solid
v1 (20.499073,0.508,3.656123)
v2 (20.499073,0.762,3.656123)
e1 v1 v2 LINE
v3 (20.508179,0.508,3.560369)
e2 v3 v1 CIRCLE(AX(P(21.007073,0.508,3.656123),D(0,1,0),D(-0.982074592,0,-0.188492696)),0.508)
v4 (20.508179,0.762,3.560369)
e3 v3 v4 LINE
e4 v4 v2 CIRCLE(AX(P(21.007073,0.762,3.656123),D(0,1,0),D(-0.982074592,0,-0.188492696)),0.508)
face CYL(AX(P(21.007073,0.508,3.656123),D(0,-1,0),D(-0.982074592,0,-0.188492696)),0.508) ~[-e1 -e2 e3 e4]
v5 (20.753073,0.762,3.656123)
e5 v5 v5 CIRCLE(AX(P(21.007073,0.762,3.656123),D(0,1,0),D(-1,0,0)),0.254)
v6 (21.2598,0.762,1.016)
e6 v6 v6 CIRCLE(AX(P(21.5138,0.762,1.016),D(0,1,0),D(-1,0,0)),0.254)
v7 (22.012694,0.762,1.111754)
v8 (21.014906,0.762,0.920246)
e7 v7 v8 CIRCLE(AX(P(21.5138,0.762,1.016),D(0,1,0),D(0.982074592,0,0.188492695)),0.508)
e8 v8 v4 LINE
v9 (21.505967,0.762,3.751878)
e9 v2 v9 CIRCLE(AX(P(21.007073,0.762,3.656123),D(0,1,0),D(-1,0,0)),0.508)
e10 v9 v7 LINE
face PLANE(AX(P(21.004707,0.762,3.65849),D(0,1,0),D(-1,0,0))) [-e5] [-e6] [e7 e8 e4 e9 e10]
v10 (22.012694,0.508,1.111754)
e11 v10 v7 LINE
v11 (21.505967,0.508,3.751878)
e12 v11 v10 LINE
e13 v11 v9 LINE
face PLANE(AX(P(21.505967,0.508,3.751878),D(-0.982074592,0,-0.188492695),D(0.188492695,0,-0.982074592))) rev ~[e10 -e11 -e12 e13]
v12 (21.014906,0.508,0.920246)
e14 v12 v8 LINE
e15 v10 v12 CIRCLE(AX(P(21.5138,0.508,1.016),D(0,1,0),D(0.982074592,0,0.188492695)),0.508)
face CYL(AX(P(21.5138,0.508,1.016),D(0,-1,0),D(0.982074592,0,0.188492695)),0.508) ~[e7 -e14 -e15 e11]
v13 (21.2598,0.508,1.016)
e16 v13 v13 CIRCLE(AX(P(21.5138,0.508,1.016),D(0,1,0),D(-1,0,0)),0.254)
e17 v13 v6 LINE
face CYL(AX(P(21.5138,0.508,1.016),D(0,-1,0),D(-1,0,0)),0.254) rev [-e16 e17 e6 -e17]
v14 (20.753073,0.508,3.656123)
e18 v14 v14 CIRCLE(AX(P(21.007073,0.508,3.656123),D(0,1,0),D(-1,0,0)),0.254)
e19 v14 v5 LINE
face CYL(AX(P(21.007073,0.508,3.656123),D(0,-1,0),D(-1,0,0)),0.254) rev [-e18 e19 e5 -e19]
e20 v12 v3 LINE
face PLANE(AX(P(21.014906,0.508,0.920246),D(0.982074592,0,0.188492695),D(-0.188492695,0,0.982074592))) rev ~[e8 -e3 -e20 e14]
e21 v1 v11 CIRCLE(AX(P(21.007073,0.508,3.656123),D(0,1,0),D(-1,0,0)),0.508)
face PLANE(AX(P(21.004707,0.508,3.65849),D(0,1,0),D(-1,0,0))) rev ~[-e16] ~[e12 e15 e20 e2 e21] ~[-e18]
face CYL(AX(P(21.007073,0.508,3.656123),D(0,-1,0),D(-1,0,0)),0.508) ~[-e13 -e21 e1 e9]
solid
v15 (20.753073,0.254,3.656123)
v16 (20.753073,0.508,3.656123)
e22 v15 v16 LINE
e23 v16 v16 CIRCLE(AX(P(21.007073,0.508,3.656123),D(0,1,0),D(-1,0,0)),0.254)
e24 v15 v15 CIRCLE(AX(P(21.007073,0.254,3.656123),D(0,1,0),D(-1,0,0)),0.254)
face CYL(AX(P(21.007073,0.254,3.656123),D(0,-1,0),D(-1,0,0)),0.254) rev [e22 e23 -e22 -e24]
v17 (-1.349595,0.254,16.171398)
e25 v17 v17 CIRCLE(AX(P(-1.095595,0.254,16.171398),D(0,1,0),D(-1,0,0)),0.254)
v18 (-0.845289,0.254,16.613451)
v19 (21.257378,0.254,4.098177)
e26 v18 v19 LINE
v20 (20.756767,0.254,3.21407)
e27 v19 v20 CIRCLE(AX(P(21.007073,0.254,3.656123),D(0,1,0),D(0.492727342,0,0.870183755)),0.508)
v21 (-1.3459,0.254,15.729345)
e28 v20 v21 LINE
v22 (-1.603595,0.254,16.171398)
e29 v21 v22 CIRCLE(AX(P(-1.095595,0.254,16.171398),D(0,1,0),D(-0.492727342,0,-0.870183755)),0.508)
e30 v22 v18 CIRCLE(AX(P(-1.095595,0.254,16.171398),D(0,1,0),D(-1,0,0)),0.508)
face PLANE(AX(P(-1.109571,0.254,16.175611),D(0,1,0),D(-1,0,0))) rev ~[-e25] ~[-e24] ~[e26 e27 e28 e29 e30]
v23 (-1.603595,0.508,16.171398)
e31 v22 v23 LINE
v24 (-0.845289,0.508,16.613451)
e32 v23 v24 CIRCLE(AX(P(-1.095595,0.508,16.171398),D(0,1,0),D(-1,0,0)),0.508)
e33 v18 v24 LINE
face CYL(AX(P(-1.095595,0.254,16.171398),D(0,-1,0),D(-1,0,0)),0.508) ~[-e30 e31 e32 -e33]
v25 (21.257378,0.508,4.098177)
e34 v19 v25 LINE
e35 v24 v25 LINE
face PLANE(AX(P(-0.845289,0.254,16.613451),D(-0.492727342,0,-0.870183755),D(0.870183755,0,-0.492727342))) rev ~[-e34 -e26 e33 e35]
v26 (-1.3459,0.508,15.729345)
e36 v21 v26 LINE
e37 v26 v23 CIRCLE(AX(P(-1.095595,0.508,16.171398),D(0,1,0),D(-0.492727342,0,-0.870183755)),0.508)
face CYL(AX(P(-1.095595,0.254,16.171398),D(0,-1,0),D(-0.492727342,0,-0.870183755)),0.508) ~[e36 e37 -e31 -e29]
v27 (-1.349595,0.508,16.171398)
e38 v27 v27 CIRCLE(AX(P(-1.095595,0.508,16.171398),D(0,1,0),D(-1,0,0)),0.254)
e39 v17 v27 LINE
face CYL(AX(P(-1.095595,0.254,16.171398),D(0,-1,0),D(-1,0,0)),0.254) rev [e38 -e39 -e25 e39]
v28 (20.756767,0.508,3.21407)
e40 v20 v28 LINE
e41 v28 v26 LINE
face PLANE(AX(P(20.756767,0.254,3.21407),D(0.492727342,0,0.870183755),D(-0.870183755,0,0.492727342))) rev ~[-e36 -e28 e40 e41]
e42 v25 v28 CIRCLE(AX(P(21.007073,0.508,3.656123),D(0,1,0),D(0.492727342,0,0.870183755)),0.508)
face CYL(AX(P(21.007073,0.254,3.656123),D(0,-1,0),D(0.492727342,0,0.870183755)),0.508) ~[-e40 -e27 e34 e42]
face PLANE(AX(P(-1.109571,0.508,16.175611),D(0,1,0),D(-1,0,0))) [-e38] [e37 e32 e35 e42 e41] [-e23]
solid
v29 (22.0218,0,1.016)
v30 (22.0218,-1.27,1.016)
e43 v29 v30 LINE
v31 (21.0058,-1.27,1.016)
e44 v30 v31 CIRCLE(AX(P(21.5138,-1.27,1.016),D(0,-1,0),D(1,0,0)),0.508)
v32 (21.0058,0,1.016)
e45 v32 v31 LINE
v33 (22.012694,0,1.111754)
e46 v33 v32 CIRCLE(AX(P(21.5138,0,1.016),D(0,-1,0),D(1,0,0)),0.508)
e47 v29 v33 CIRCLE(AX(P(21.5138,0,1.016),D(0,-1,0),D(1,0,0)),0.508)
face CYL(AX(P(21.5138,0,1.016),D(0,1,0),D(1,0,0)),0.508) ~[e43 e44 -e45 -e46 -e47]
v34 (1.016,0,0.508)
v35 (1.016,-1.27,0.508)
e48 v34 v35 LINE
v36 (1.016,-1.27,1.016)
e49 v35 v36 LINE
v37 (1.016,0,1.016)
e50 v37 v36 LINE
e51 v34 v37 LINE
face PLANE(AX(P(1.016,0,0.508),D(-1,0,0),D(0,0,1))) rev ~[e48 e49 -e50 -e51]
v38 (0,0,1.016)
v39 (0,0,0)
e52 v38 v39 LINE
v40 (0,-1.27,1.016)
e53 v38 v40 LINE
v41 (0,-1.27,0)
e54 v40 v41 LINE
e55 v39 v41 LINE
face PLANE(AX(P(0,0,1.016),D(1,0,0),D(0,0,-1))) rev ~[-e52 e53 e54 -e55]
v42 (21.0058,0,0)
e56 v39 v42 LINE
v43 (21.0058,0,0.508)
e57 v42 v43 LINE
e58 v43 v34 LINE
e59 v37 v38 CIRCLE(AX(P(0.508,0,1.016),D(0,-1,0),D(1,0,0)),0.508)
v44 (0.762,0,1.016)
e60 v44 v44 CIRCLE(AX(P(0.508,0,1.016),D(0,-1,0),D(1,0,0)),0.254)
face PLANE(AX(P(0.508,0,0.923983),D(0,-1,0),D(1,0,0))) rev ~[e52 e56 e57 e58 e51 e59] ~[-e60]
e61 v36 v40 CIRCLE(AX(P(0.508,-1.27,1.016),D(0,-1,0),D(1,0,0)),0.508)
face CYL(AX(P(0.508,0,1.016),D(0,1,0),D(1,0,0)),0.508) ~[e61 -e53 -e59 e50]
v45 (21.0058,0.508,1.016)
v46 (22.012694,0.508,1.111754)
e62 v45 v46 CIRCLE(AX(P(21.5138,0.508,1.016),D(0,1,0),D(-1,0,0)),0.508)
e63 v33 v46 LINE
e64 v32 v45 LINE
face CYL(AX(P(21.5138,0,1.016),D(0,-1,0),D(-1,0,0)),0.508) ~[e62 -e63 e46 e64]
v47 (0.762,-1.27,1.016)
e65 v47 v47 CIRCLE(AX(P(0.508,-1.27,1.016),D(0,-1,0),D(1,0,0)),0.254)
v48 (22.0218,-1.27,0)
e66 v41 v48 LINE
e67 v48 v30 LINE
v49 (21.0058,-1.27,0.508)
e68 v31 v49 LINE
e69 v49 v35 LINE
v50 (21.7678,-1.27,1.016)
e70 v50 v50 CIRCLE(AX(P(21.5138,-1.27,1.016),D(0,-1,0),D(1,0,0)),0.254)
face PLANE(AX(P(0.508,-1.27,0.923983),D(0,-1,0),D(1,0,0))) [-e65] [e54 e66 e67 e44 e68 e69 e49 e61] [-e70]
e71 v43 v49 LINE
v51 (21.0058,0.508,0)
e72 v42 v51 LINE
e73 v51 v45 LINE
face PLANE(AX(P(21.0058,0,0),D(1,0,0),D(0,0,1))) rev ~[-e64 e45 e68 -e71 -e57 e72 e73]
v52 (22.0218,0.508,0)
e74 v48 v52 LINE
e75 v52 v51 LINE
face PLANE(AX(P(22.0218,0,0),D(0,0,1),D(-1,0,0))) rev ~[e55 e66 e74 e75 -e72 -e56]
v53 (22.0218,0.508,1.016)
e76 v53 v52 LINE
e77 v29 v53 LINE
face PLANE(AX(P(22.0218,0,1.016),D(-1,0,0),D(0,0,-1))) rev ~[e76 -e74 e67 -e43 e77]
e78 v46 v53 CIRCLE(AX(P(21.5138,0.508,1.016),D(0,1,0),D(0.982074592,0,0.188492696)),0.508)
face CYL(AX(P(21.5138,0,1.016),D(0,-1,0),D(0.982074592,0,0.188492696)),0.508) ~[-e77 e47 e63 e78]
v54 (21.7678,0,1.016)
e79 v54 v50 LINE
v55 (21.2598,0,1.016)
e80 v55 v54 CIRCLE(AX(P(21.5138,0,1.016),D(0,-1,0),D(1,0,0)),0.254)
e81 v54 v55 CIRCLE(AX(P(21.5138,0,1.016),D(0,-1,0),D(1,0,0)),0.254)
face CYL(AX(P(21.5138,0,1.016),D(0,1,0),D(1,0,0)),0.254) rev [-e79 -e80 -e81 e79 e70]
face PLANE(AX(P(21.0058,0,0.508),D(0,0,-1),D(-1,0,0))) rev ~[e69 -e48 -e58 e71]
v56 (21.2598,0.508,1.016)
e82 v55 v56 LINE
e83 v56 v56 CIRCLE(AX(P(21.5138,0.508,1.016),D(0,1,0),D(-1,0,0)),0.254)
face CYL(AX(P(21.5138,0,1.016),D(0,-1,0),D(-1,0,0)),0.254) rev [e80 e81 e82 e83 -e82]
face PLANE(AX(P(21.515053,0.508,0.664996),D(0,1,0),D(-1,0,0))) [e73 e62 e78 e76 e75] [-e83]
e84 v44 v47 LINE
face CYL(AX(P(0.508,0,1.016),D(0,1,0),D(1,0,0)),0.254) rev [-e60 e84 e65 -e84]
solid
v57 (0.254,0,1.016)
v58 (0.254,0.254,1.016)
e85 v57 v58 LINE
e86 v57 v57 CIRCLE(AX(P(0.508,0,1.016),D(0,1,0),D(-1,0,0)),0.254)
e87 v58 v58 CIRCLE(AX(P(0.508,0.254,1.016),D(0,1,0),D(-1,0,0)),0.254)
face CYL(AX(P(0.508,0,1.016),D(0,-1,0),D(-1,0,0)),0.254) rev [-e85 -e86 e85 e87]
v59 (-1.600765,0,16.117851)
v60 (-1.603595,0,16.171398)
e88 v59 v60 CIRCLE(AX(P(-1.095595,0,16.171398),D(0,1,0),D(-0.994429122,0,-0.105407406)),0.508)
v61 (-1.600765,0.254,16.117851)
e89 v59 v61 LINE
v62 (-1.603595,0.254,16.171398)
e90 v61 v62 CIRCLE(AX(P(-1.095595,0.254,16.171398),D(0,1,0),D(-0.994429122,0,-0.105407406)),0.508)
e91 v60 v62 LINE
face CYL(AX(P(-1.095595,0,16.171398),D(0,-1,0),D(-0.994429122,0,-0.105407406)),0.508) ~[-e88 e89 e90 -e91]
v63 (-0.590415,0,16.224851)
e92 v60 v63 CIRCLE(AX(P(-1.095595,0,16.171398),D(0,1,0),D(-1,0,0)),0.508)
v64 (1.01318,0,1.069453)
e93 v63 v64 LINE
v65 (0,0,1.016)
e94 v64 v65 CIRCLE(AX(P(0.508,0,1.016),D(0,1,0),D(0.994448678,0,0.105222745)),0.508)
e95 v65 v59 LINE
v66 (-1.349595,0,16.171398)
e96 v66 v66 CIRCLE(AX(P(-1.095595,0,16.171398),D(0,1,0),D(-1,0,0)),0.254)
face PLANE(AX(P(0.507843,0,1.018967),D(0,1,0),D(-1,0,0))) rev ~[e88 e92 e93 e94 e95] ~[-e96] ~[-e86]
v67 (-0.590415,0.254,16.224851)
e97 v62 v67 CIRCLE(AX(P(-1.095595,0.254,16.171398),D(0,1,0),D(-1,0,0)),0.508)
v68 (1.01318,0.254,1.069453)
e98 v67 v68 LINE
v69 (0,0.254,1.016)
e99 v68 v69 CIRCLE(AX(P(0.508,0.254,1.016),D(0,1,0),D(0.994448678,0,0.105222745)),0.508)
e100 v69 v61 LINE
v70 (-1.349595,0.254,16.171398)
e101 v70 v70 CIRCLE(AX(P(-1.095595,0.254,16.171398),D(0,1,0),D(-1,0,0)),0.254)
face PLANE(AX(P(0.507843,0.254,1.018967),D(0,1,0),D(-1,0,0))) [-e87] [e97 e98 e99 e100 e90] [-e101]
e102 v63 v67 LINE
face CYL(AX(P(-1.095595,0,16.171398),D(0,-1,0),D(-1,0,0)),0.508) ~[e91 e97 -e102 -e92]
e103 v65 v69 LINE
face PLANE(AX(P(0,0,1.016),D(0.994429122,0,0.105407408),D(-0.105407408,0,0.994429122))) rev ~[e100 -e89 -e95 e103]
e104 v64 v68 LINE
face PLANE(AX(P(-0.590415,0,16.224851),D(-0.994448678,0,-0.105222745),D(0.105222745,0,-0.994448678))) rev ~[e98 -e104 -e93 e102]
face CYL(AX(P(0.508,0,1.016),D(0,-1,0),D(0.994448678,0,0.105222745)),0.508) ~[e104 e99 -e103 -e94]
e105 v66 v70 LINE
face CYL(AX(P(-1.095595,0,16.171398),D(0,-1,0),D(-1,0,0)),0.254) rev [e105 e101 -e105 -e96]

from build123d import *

# Parameters (mm, degrees)
F0_R     = 0.254
F1_DEPTH = 1.27
F2_R     = 0.254
F3_DEPTH = 0.254
F4_R     = 0.254
F5_DEPTH = 0.254
F6_R     = 0.254
F7_DEPTH = 0.254
F8_R     = 0.254
F9_DEPTH = 0.508


with BuildPart() as f1:
    # F0 (on Front) → F1 (new body)
    with BuildSketch(Plane.XZ):
        with BuildLine():
            Line((0, 1.016), (0, 0.508))
            Line((0, 0.508), (1.016, 0.508))
            Line((1.016, 0.508), (1.016, 1.016))
            ThreePointArc((1.016, 1.016), (0.508, 1.524), (0, 1.016))
        make_face()
        with Locations((0.508, 1.016)):
            Circle(F0_R, mode=Mode.SUBTRACT)
        Polygon((0, 0.508), (0, 0), (22.0218, 0), (22.0218, 0.508), (21.0058, 0.508), (1.016, 0.508), align=None)
        with BuildLine():
            Line((21.0058, 0.508), (22.0218, 0.508))
            Line((22.0218, 0.508), (22.0218, 1.016))
            ThreePointArc((22.0218, 1.016), (21.5138, 1.524), (21.0058, 1.016))
            Line((21.0058, 1.016), (21.0058, 0.508))
        make_face()
        with Locations((21.5138, 1.016)):
            Circle(F0_R, mode=Mode.SUBTRACT)
    extrude(amount=F1_DEPTH)

    # F8 (on face) → F9 (join)
    with BuildSketch(Plane(origin=(0, 0, 0), x_dir=(-1, 0, 0), z_dir=(0, 1, 0))):
        with BuildLine():
            ThreePointArc((-22.0126938926, 1.1117542892), (-22.0195183492, 1.064093152), (-22.0218, 1.016))
            Line((-22.0218, 1.016), (-22.0218, 0.508))
            Line((-22.0218, 0.508), (-22.0218, 0))
            Line((-22.0218, 0), (-21.0058, 0))
            Line((-21.0058, 0), (-21.0058, 0.508))
            Line((-21.0058, 0.508), (-21.0058, 1.016))
            ThreePointArc((-21.0058, 1.016), (-21.465706848, 1.5217183492), (-22.0126938926, 1.1117542892))
        make_face()
        with Locations((-21.5138, 1.016)):
            Circle(F8_R, mode=Mode.SUBTRACT)
    extrude(amount=F9_DEPTH)


with BuildPart() as f3:
    # F2 (on face) → F3 (new body)
    with BuildSketch(Plane(origin=(0, 0, 0), x_dir=(-1, 0, 0), z_dir=(0, 1, 0))):
        with BuildLine():
            ThreePointArc((-1.0131799286, 1.0694531545), (-0.5347637466, 0.5087055077), (0, 1.016))
            ThreePointArc((0, 1.016), (-0.4812362534, 1.5232944923), (-1.0131799286, 1.0694531545))
        make_face()
        with Locations((-0.508, 1.016)):
            Circle(F2_R, mode=Mode.SUBTRACT)
        with BuildLine():
            ThreePointArc((-1.0131799286, 1.0694531545), (-0.4812362534, 1.5232944923), (0, 1.016))
            Line((0, 1.016), (1.6007646277, 16.1178508951))
            ThreePointArc((1.6007646277, 16.1178508951), (1.0420945746, 15.6662228951), (0.5904147052, 16.224851013))
            Line((0.5904147052, 16.224851013), (-1.0131799286, 1.0694531545))
        make_face()
        with BuildLine():
            ThreePointArc((0.5904147052, 16.224851013), (1.0420945746, 15.6662228951), (1.6007646277, 16.1178508951))
            ThreePointArc((1.6007646277, 16.1178508951), (1.6028866389, 16.1445870108), (1.6035946338, 16.1713978585))
            ThreePointArc((1.6035946338, 16.1713978585), (1.1223583804, 16.6786923508), (0.5904147052, 16.224851013))
        make_face()
        with Locations((1.0955946338, 16.1713978585)):
            Circle(F2_R, mode=Mode.SUBTRACT)
    extrude(amount=F3_DEPTH)


with BuildPart() as f5:
    # F4 (on face) → F5 (new body)
    with BuildSketch(Plane(origin=(0, 0.254, 0), x_dir=(-1, 0, 0), z_dir=(0, 1, 0))):
        with BuildLine():
            ThreePointArc((1.3459001233, 15.7293445112), (1.5344677297, 15.9155572721), (1.6035946338, 16.1713978585))
            ThreePointArc((1.6035946338, 16.1713978585), (1.3514352202, 16.6102709545), (0.8452891443, 16.6134512059))
            ThreePointArc((0.8452891443, 16.6134512059), (0.6535412864, 15.921092369), (1.3459001233, 15.7293445112))
        make_face()
        with Locations((1.0955946338, 16.1713978585)):
            Circle(F4_R, mode=Mode.SUBTRACT)
        with BuildLine():
            ThreePointArc((1.3459001233, 15.7293445112), (0.6535412864, 15.921092369), (0.8452891443, 16.6134512059))
            Line((0.8452891443, 16.6134512059), (-21.2573782243, 4.0981767306))
            ThreePointArc((-21.2573782243, 4.0981767306), (-20.7512321484, 4.0949964791), (-20.4990727348, 3.6561233832))
            ThreePointArc((-20.4990727348, 3.6561233832), (-20.5681996389, 3.4002827968), (-20.7567672453, 3.2140700358))
            Line((-20.7567672453, 3.2140700358), (1.3459001233, 15.7293445112))
        make_face()
        with BuildLine():
            ThreePointArc((-20.4990727348, 3.6561233832), (-20.7512321484, 4.0949964791), (-21.2573782243, 4.0981767306))
            ThreePointArc((-21.2573782243, 4.0981767306), (-21.4491260822, 3.4058178937), (-20.7567672453, 3.2140700358))
            ThreePointArc((-20.7567672453, 3.2140700358), (-20.5681996389, 3.4002827968), (-20.4990727348, 3.6561233832))
        make_face()
        with Locations((-21.0070727348, 3.6561233832)):
            Circle(F4_R, mode=Mode.SUBTRACT)
    extrude(amount=F5_DEPTH)


with BuildPart() as f7:
    # F6 (on face) → F7 (new body)
    with BuildSketch(Plane(origin=(0, 0.508, 0), x_dir=(-1, 0, 0), z_dir=(0, 1, 0))):
        with BuildLine():
            ThreePointArc((-20.5081788422, 3.5603690941), (-20.5013543856, 3.6080302312), (-20.4990727348, 3.6561233832))
            ThreePointArc((-20.4990727348, 3.6561233832), (-20.9589795828, 4.1618417324), (-21.5059666274, 3.7518776724))
            ThreePointArc((-21.5059666274, 3.7518776724), (-21.102827024, 3.1572294906), (-20.5081788422, 3.5603690941))
        make_face()
        with Locations((-21.0070727348, 3.6561233832)):
            Circle(F6_R, mode=Mode.SUBTRACT)
        with BuildLine():
            ThreePointArc((-20.5081788422, 3.5603690941), (-21.102827024, 3.1572294906), (-21.5059666274, 3.7518776724))
            Line((-21.5059666274, 3.7518776724), (-22.0126938926, 1.1117542892))
            ThreePointArc((-22.0126938926, 1.1117542892), (-21.465706848, 1.5217183492), (-21.0058, 1.016))
            ThreePointArc((-21.0058, 1.016), (-21.0080816508, 0.967906848), (-21.0149061074, 0.9202457108))
            Line((-21.0149061074, 0.9202457108), (-20.5081788422, 3.5603690941))
        make_face()
        with BuildLine():
            ThreePointArc((-21.0058, 1.016), (-21.465706848, 1.5217183492), (-22.0126938926, 1.1117542892))
            ThreePointArc((-22.0126938926, 1.1117542892), (-21.6095542892, 0.5171061074), (-21.0149061074, 0.9202457108))
            ThreePointArc((-21.0149061074, 0.9202457108), (-21.0080816508, 0.967906848), (-21.0058, 1.016))
        make_face()
        with Locations((-21.5138, 1.016)):
            Circle(F6_R, mode=Mode.SUBTRACT)
    extrude(amount=F7_DEPTH)


solid = Compound([f1.part, f3.part, f5.part, f7.part])
